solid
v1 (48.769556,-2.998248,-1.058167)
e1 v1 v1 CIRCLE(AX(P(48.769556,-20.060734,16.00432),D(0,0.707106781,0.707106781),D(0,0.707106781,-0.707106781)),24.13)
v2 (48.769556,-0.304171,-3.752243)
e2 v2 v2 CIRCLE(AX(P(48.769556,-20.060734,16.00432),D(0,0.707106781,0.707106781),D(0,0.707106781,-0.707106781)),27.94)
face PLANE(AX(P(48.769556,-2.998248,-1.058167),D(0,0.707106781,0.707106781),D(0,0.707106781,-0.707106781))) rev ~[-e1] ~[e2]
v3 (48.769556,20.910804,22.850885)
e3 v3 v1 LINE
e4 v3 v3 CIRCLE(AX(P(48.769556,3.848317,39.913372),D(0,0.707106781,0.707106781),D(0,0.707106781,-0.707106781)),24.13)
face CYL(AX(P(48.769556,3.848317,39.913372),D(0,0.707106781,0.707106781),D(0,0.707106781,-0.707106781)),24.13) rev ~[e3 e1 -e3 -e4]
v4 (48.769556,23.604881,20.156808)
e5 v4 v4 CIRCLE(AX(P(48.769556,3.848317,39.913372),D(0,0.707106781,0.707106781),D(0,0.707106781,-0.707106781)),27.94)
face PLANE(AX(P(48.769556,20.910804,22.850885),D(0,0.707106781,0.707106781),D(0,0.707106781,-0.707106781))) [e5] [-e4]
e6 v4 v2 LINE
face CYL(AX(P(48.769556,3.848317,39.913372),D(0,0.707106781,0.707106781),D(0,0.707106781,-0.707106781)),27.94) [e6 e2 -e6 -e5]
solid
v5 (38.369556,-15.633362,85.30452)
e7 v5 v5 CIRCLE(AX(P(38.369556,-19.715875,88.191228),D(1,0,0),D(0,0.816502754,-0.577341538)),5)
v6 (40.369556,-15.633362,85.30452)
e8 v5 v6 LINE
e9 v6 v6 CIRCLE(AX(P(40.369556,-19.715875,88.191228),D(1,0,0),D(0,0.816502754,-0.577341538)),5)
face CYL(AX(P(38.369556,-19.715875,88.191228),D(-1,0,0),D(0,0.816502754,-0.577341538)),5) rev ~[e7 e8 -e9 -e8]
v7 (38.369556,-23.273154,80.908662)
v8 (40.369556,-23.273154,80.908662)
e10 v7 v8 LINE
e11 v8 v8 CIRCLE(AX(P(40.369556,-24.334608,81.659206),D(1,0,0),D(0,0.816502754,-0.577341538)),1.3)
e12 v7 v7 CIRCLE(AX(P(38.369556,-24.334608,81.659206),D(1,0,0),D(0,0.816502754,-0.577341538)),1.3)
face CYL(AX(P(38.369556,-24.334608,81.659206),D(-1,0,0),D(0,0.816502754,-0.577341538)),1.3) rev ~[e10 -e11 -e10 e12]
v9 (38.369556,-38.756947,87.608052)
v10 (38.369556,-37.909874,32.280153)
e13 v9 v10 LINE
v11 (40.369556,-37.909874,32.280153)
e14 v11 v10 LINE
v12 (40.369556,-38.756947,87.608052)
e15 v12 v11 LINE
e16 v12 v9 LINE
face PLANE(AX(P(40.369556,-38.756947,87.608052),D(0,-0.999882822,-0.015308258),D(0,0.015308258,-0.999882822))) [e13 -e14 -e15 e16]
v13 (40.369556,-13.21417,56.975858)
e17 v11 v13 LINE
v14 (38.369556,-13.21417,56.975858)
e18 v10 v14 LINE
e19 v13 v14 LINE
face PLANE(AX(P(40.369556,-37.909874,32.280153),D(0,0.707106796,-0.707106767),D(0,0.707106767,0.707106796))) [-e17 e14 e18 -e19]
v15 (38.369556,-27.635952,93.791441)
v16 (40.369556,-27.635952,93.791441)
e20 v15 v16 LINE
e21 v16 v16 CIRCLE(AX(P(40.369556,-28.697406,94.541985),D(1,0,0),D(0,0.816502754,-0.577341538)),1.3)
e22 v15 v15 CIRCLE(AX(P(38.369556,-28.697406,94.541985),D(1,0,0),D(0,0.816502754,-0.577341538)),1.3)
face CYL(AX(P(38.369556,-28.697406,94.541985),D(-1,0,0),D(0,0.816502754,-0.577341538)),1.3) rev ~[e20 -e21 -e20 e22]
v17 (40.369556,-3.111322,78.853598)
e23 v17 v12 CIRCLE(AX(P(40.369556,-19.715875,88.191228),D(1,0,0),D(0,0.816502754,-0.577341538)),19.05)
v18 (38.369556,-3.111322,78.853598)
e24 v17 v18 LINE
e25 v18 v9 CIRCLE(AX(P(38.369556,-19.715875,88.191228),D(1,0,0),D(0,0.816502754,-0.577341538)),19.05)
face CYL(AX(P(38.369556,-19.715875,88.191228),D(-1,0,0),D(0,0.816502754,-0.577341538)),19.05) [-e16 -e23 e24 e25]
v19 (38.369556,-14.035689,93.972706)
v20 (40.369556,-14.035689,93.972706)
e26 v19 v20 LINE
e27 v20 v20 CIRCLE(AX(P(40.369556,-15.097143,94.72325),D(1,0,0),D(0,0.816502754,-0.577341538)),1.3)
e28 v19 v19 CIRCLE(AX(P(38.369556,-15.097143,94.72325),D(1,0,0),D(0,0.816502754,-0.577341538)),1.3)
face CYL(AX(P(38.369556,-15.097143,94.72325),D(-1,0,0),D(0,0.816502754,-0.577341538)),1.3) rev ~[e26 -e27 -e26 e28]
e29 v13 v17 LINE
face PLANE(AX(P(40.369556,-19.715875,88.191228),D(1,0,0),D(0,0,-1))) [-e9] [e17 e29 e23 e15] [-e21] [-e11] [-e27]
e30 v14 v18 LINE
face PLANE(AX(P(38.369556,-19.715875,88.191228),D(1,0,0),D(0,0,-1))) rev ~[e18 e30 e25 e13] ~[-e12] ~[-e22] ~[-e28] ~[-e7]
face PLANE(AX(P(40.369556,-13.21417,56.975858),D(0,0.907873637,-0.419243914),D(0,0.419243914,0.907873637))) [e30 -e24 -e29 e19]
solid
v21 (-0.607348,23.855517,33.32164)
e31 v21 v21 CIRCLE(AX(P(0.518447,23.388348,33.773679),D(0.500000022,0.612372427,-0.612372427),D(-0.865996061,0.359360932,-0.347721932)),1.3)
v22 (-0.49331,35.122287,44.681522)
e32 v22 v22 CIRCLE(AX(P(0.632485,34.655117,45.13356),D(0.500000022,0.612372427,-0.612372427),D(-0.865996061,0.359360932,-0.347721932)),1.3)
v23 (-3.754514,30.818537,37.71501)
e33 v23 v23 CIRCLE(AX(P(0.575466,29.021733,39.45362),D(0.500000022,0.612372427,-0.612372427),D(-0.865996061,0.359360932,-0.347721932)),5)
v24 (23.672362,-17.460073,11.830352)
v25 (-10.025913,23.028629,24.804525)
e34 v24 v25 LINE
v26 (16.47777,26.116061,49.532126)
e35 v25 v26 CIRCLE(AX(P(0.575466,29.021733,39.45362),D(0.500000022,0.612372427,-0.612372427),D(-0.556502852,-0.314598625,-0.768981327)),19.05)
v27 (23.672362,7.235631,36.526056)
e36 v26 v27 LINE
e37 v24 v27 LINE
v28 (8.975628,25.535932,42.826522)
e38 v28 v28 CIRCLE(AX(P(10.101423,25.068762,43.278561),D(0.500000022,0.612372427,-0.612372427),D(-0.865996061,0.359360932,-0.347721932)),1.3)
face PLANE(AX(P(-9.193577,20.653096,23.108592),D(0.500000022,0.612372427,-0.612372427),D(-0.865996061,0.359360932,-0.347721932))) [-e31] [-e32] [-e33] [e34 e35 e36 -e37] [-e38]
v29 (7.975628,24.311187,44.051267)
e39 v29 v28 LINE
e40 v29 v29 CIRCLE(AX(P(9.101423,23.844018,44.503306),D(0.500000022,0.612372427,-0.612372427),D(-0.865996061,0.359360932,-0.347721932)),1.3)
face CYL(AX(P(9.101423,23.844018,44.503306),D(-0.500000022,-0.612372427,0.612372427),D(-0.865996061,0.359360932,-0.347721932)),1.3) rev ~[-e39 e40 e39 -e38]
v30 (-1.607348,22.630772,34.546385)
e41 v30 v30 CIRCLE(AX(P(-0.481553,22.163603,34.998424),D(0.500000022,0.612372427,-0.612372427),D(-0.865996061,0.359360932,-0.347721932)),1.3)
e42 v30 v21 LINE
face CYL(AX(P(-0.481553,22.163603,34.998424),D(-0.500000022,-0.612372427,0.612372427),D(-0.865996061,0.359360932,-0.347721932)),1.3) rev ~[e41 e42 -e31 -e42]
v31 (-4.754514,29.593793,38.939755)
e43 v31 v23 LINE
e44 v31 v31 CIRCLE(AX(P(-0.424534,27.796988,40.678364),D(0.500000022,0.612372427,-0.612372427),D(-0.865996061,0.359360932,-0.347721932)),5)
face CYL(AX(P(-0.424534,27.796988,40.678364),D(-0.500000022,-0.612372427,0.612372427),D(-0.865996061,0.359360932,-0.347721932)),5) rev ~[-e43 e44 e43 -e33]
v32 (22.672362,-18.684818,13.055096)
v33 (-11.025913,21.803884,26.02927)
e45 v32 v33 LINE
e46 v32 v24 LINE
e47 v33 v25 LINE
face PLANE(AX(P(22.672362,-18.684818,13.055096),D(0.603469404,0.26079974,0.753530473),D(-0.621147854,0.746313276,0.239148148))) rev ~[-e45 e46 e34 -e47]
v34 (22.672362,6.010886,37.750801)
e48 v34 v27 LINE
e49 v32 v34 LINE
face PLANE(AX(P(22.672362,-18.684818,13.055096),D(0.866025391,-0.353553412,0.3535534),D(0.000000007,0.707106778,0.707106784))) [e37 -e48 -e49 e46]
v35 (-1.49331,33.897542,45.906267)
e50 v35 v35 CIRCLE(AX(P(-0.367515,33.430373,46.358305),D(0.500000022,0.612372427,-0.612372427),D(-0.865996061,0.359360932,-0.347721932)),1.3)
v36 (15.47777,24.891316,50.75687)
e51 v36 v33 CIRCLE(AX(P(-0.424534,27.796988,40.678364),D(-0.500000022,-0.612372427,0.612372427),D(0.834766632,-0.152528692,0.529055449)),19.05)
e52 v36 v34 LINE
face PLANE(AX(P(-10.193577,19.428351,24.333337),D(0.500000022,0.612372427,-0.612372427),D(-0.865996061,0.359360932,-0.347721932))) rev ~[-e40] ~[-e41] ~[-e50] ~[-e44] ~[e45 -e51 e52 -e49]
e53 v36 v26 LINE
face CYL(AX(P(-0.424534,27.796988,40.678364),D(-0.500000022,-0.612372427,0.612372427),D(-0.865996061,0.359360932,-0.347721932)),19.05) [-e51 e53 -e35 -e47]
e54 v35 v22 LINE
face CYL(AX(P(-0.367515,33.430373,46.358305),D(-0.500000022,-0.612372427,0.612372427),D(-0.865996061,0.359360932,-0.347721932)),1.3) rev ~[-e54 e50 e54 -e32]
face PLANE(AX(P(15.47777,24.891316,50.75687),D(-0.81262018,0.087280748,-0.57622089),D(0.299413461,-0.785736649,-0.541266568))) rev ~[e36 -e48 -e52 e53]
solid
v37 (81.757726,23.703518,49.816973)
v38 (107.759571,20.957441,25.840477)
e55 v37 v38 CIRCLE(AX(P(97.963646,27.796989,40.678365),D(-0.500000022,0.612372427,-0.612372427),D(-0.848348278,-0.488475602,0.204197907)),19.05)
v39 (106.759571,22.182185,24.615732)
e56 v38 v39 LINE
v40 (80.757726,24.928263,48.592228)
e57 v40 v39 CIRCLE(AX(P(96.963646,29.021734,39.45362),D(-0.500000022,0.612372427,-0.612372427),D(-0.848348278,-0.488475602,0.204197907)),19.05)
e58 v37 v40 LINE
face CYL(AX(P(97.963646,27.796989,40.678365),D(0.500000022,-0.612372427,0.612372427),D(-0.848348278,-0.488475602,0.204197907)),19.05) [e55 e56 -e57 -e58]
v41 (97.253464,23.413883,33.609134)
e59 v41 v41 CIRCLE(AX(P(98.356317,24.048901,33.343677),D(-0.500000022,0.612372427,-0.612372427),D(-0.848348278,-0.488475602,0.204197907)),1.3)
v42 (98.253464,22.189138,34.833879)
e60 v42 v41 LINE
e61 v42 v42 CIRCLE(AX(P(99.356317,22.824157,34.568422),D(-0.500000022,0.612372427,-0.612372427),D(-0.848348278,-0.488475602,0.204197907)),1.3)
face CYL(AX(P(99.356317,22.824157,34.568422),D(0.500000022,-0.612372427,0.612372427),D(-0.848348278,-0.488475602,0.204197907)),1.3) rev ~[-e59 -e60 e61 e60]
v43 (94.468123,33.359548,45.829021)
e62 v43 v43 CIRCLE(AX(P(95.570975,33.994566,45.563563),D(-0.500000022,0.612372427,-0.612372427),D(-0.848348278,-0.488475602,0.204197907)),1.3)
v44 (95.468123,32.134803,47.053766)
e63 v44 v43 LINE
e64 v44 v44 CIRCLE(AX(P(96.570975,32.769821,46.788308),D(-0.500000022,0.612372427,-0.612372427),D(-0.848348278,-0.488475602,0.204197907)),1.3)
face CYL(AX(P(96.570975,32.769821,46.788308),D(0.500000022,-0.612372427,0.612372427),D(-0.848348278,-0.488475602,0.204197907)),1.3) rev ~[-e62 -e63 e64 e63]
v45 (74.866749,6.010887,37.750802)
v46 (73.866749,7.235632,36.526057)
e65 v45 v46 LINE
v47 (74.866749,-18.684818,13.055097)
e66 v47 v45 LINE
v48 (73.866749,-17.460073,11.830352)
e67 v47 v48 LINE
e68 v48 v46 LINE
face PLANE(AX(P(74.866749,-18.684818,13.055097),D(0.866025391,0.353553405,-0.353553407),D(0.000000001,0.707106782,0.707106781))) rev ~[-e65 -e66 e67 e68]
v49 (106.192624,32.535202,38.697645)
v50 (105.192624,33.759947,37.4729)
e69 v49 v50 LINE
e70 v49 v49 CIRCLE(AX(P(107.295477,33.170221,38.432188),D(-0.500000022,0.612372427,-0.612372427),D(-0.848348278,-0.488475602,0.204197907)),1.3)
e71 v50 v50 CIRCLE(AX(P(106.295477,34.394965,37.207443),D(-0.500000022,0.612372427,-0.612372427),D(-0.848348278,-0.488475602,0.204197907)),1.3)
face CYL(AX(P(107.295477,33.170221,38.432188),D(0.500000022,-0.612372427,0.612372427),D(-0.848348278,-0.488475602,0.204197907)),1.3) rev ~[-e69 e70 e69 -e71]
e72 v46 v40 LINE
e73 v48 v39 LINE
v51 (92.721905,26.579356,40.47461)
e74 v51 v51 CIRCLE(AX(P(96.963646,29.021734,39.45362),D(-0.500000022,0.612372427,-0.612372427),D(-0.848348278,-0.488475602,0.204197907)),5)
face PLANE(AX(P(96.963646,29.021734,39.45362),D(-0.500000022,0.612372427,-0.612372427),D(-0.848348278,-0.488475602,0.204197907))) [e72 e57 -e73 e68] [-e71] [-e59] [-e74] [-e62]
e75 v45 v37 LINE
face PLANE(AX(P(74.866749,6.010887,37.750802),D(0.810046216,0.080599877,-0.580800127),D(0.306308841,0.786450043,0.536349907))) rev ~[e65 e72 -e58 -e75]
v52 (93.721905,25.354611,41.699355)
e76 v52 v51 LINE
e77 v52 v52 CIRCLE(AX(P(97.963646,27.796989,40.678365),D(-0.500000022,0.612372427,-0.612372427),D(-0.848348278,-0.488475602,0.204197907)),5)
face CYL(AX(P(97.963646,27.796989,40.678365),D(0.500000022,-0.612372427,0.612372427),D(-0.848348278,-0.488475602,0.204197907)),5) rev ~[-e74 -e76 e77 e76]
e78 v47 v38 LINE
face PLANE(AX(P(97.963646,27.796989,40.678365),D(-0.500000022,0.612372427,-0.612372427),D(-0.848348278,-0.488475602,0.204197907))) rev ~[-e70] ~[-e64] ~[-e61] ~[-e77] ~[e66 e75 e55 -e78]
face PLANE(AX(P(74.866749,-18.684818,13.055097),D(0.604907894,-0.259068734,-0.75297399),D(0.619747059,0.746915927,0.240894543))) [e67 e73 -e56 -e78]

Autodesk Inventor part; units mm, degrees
ref_plane "Work Plane2" through (-10.193577, 19.428351, 24.333337) normal (0.5, 0.6123724, -0.6123724) x (-0.8659961, 0.3593609, -0.3477219)
sketch "Sketch1" plane through (-10.193577, 19.428351, 24.333337) normal (0.5, 0.6123724, -0.6123724) x (-0.8659961, 0.3593609, -0.3477219)
  circle A0 centre (-11.136116, 17.567445) radius 13.35
  circle A1 centre (-11.136116, 9.567445) radius 1.3
  circle A2 centre (-11.136116, 25.567445) radius 1.3
  circle A3 centre (-22.136116, 17.567445) radius 1.3
  circle A4 centre (-11.136116, 17.567445) radius 5
  circle A5 centre (-11.136116, 17.567445) radius 19.05
  point P0 (-7.348153, -30.884757)
  dimension "d3" = 38.1
extrude "Extrusion1" add sketch "Sketch1" along normal blind 2 contours A0 | A5
ref_plane "Work Plane3" through (38.369556, -40.049097, 83.810785) normal (1, 0, 0) x (0, 0.8165027, -0.5773415)
ref_plane "Work Plane4" through (38.369556, -40.049097, 83.810785) normal (1, 0, 0) x (0, 0.8165027, -0.5773415)
sketch "Sketch2" plane through (38.369556, -40.049097, 83.810785) normal (1, 0, 0) x (0, 0.8165027, -0.5773415)
  circle A0 centre (14.07312, 15.315857) radius 13.35
  circle A1 centre (14.07312, 7.315857) radius 1.3
  circle A2 centre (14.07312, 23.315857) radius 1.3
  circle A3 centre (3.07312, 15.315857) radius 1.3
  circle A4 centre (14.07312, 15.315857) radius 5
  circle A5 centre (14.07312, 15.315857) radius 19.05
  point P0 (81.087646, -45.309729)
  dimension "d2" = 38.1
extrude "Extrusion2" add sketch "Sketch2" along normal blind 2 separate body contours A0 | A5
ref_plane "Work Plane5" through (77.39899, 56.579392, 52.285482) normal (0.5, -0.6123724, 0.6123724) x (0.7923994, 0.6088063, -0.038185)
sketch "Sketch4" plane through (0.575465, 29.021734, 39.45362) normal (0.5, 0.6123724, -0.6123724) x (-0.7745967, 0, -0.6324555)
  circle A0 centre (0, 0) radius 19.05 projected
  circle A1 centre (0, 0) radius 19.05 projected
  point P0 (25.398414, -41.435313)
sketch "Sketch8" plane through (-10.193577, 19.428351, 24.333337) normal (0.5, 0.6123724, -0.6123724) x (-0.8659961, 0.3593609, -0.3477219)
  circle A0 centre (-11.136116, 17.567445) radius 19.05
  line L0 (-29.456151, 22.790356) -> (-37.949033, 0.312331)
  line L1 (-38.236466, -34.611486) -> (2.996032, 4.79306)
  line L2 (-38.236466, -34.611486) -> (-37.949033, 0.312331)
  point P0 (-7.348153, -30.884757)
  point P1 (0.984757, 2.87095)
  point P2 (-30.144601, 16.31047)
ref_plane "Work Plane7" through (48.769556, 20.910804, 22.850885) normal (0, 0.7071068, 0.7071068) x (0, 0.7071068, -0.7071068)
sketch "Sketch11" plane through (48.769556, 20.910804, 22.850885) normal (0, 0.7071068, 0.7071068) x (0, 0.7071068, -0.7071068)
  circle A0 centre (-24.13, 0) radius 24.13 projected
  circle A1 centre (-24.13, 0) radius 27.94
  point P0 (1.371844, 48.769556)
  dimension "d19" = 55.88
extrude "Extrusion7" add sketch "Sketch11" against normal blind 33.812505 separate body
ref_plane "Work Plane8" through (97.963646, 27.796989, 40.678365) normal (-0.5, 0.6123724, -0.6123724) x (-0.8483483, -0.4884756, 0.2041979)
sketch "Sketch12" plane through (97.963646, 27.796989, 40.678365) normal (-0.5, 0.6123724, -0.6123724) x (-0.8483483, -0.4884756, 0.2041979)
  circle A0 centre (0, 0) radius 13.35 projected
  circle A1 centre (0, -8) radius 1.3 projected
  circle A2 centre (0, 8) radius 1.3 projected
  circle A3 centre (-11, 0) radius 1.3 projected
  circle A4 centre (0, 0) radius 5 projected
  circle A5 centre (0, 0) radius 19.05
  point P0 (88.379006, -31.292647)
  dimension "d24" = 38.1
extrude "Extrusion9" add sketch "Sketch12" along normal blind 2 separate body contours A0 | A5
sketch "Sketch13" plane through (97.963646, 27.796989, 40.678365) normal (-0.5, 0.6123724, -0.6123724) x (-0.8483483, -0.4884756, 0.2041979)
  line L0 (36.658828, -45.969558) -> (29.63839, -11.757439)
  line L1 (29.63839, -11.757439) -> (14.105649, 12.803639)
  circle A0 centre (0, 0) radius 19.05
  line L2 (36.658828, -45.969558) -> (-12.394751, -14.466259)
  point P0 (88.379006, -31.292647)
  point P1 (17.61391, 7.256217)
  point P2 (-7.999269, -17.289135)
extrude "Extrusion10" add sketch "Sketch13" along normal blind 2 separate body contours L2 A0 L1 L0
extrude "Extrusion11" add sketch "Sketch8" along normal blind 2 separate body contours A0 L1 L2 L0
sketch "Sketch14" plane through (40.369556, -19.715875, 88.191228) normal (1, 0, 0) x (0, 0, -1)
  line L0 (55.911075, -18.193999) -> (31.21537, 6.501705)
  line L1 (31.21537, 6.501705) -> (6.584901, 17.875726)
  circle A0 centre (0, 0) radius 19.05
  line L2 (55.911075, -18.193999) -> (0, -19.05)
  point P0 (88.191228, 19.715875)
  point P1 (9.33763, 16.604553)
  point P2 (0.583176, -19.041072)
sketch "Sketch14 outline for Extrusion12" plane through (40.369556, -19.715875, 88.191228) normal (1, 0, 0) x (0, 0, -1)
  line L0 (55.911075, -18.193999) -> (31.21537, 6.501705)
  line L1 (0.583176, -19.041072) -> (55.911075, -18.193999)
  arc A0 (9.33763, 16.604553) -> (0.583176, -19.041072) centre (0, 0) cw
  line L2 (31.21537, 6.501705) -> (9.33763, 16.604553)
extrude "Extrusion12" add sketch "Sketch14 outline for Extrusion12" against normal blind 2 separate body
combine bodies "Aleta Inferior" operation type add bodies to combine 7 2
combine bodies "AletaSuperiorIzq" operation type add bodies to combine 1 6
combine bodies "AletaSuperiorDer" operation type add bodies to combine 5 4
properties part number "Base3MotorsHead"
